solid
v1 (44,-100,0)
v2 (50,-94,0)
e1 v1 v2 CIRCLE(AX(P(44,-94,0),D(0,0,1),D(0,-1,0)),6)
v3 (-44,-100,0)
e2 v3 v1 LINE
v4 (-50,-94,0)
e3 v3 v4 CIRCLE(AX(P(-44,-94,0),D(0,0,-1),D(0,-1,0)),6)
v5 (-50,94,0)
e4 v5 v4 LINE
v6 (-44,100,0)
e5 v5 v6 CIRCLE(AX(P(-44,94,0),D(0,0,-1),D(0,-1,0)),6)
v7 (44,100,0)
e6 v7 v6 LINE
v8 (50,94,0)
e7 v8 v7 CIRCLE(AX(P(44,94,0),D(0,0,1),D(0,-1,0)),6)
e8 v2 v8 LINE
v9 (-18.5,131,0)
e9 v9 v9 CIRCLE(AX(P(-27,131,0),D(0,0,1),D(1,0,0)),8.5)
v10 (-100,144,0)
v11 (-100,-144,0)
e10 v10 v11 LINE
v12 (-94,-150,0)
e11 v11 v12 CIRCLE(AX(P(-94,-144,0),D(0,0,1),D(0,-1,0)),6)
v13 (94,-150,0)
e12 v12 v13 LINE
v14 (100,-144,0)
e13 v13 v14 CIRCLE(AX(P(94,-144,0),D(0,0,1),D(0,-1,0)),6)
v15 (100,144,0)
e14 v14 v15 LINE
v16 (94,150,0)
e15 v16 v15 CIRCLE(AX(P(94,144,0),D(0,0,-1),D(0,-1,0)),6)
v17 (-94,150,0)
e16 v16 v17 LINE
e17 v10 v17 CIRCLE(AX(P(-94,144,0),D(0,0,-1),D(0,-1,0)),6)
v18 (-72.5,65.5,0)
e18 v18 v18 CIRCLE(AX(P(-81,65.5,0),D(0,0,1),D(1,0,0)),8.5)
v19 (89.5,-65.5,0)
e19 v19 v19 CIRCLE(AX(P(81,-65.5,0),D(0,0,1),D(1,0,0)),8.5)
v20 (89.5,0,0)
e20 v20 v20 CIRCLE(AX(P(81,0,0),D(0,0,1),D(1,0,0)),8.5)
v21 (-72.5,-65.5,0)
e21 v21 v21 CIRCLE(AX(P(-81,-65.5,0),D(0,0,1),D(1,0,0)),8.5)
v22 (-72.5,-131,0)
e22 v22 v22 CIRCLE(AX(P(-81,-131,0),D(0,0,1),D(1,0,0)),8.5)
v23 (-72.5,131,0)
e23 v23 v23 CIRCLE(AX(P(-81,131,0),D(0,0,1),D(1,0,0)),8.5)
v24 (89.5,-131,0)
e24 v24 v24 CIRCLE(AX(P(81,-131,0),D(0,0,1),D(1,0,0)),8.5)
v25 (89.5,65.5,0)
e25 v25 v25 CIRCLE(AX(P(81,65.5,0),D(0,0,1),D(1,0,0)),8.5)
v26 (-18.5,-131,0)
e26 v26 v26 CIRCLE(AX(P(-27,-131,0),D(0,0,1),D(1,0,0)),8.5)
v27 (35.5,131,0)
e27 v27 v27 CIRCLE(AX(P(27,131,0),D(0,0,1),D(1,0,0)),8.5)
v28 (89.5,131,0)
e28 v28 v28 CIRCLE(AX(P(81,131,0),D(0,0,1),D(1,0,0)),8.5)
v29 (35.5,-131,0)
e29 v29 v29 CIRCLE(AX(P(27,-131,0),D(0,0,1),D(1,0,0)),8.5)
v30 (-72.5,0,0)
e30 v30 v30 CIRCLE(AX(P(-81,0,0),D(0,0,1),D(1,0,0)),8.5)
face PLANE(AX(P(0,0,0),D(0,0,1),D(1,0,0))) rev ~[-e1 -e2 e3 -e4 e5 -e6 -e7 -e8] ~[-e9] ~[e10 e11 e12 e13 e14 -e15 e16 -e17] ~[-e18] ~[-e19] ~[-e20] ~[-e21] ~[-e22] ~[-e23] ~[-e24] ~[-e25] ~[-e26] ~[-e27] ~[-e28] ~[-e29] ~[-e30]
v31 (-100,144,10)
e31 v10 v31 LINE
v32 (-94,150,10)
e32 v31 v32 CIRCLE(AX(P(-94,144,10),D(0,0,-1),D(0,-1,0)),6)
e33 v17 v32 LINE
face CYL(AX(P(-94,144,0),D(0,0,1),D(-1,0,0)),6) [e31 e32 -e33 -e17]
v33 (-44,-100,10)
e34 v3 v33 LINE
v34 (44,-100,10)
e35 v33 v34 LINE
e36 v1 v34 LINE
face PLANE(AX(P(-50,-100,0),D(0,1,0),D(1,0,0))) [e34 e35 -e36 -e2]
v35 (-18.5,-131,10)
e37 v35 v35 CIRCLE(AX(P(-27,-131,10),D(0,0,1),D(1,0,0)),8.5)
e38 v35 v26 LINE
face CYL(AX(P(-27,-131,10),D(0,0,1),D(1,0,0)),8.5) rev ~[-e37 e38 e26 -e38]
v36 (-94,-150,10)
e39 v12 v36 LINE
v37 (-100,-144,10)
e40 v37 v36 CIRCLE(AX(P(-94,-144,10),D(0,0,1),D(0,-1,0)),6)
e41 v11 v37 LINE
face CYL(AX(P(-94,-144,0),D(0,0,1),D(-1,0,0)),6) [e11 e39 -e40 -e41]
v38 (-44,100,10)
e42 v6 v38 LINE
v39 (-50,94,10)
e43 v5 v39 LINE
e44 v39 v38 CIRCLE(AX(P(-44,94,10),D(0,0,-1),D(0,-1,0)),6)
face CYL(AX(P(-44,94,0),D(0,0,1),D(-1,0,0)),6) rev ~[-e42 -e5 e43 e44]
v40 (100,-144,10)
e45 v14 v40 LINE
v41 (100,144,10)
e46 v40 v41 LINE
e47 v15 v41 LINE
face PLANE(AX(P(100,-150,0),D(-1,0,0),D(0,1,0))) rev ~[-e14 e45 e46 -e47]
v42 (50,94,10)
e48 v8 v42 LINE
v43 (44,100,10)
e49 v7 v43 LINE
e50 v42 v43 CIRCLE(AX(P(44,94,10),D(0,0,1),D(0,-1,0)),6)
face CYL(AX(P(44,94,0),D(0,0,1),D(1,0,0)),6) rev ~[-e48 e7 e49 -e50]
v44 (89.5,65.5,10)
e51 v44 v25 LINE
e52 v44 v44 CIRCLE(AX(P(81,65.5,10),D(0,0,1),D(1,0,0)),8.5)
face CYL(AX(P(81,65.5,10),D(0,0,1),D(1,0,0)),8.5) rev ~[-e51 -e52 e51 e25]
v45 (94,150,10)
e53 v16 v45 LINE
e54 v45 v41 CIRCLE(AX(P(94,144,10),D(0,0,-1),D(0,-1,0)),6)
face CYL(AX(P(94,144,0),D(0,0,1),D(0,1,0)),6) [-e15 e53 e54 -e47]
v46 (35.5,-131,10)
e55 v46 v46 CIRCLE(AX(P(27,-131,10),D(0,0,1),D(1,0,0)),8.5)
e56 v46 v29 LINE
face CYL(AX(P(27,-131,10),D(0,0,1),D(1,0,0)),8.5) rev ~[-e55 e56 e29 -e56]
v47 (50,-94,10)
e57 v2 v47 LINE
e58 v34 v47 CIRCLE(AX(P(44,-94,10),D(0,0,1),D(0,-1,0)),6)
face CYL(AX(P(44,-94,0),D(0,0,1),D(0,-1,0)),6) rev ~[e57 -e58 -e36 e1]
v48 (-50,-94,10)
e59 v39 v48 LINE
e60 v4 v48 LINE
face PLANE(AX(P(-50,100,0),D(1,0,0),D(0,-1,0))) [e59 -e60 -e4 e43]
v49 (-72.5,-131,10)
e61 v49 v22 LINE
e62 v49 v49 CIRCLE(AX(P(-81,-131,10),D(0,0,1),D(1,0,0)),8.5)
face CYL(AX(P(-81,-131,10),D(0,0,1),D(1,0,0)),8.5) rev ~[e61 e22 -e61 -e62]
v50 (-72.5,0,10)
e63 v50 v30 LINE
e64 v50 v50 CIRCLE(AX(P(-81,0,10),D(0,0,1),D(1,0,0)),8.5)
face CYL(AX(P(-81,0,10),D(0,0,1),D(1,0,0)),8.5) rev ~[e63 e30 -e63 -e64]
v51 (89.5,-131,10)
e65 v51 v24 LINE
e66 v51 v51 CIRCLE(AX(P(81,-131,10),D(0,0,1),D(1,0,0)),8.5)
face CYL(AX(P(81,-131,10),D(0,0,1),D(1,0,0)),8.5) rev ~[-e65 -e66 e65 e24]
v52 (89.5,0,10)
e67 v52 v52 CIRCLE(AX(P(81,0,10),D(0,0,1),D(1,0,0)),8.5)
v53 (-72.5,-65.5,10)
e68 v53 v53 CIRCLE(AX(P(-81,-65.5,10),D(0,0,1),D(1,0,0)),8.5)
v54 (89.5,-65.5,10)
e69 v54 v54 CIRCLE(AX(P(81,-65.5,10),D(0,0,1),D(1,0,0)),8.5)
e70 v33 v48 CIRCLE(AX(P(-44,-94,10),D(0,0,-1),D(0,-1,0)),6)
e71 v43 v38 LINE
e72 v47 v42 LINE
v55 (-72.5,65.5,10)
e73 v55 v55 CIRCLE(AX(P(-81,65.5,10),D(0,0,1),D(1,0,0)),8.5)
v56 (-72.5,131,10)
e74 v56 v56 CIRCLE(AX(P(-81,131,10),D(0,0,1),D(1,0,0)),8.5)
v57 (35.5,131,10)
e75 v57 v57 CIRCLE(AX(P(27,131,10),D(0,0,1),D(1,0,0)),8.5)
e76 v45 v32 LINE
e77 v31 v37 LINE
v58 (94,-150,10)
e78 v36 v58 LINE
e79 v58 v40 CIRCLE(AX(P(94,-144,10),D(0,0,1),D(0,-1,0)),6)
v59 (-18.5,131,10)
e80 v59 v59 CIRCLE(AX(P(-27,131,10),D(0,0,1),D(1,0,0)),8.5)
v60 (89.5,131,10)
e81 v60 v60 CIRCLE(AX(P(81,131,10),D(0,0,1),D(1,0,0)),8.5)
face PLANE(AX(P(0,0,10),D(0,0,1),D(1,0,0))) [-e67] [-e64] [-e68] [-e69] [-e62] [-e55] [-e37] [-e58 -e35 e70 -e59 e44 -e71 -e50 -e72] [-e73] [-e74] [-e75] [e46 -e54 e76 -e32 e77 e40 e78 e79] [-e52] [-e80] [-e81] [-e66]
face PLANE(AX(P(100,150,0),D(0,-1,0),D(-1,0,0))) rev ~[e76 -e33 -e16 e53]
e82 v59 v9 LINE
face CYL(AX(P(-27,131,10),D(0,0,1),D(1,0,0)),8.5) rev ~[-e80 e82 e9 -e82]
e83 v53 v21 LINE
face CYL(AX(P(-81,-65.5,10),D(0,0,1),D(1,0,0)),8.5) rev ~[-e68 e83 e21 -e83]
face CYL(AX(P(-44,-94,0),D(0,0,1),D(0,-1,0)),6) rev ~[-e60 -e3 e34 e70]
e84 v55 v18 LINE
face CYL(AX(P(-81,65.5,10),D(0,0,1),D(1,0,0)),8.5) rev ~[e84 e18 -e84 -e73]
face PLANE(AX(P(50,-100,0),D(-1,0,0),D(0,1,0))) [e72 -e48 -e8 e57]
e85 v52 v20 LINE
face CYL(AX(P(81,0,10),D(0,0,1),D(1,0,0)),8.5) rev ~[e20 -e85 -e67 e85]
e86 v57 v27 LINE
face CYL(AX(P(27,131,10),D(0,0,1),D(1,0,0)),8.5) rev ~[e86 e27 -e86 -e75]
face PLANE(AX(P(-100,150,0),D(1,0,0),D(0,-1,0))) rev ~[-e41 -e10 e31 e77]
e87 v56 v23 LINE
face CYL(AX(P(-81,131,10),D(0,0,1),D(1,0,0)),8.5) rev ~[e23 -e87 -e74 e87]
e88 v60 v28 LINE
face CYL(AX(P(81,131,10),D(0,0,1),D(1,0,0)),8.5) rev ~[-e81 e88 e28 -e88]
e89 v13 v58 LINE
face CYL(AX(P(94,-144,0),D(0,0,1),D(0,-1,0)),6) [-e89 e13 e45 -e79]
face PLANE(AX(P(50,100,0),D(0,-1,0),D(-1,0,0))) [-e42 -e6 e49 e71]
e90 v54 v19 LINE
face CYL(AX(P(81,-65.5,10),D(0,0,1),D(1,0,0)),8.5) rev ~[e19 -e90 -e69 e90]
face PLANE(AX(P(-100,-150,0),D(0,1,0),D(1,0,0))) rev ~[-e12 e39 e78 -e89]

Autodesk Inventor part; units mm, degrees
ref_plane "YZ Plane" through (0, 0, 0) normal (1, 0, 0) x (0, 1, 0)
ref_plane "XZ Plane" through (0, 0, 0) normal (0, 1, 0) x (-1, 0, 0)
ref_plane "XY Plane" through (0, 0, 0) normal (0, 0, 1) x (1, 0, 0)
sketch "Sketch2" plane through (0, 0, 0) normal (0, 0, 1) x (1, 0, 0)
  line L0 (-50, -100) -> (50, -100)
  line L1 (50, -100) -> (50, 100)
  line L2 (50, 100) -> (-50, 100)
  line L3 (-50, 100) -> (-50, -100)
  line L4 (-50, -100) -> (50, 100) construction
  line L5 (50, -100) -> (-50, 100) construction
  line L6 (-100, -150) -> (100, -150)
  line L7 (100, -150) -> (100, 150)
  line L8 (100, 150) -> (-100, 150)
  line L9 (-100, 150) -> (-100, -150)
  point P0 (0, 0)
  dimension "d29" = 100
  dimension "d30" = 200
  dimension "d31" = 50
extrude "Plate2" add sketch "Sketch2" along normal blind 10
sketch "Sketch5" plane through (0, 0, 10) normal (0, 0, 1) x (1, 0, 0)
  line L0 (50, 100) -> (50, -100) construction
  line L1 (50, -100) -> (-50, -100) construction
  line L2 (-50, -100) -> (-50, 100) construction
  line L3 (-50, 100) -> (50, 100) construction
  line L4 (100, -150) -> (-100, -150) construction
  line L5 (100, 150) -> (100, -150) construction
  line L6 (-100, 150) -> (100, 150) construction
  line L7 (-100, -150) -> (-100, 150) construction
  line L8 (-81, 131) -> (81, 131) construction
  line L9 (81, 131) -> (81, -131) construction
  line L10 (81, -131) -> (-81, -131) construction
  line L11 (-81, -131) -> (-81, 131) construction
  circle A0 centre (-81, -131) radius 8.5
  circle A1 centre (-81, 131) radius 8.5
  circle A2 centre (-81, 0) radius 8.5
  circle A3 centre (-81, -65.5) radius 8.5
  circle A4 centre (-81, 65.5) radius 8.5
  line L12 (-50, 0) -> (50, 0) construction
  circle A5 centre (-27, -131) radius 8.5
  circle A6 centre (-27, -65.5) radius 8.5
  circle A7 centre (-27, 0) radius 8.5
  circle A8 centre (-27, 65.5) radius 8.5
  circle A9 centre (-27, 131) radius 8.5
  circle A10 centre (27, -131) radius 8.5
  circle A11 centre (27, -65.5) radius 8.5
  circle A12 centre (27, 0) radius 8.5
  circle A13 centre (27, 65.5) radius 8.5
  circle A14 centre (27, 131) radius 8.5
  circle A15 centre (81, -131) radius 8.5
  circle A16 centre (81, -65.5) radius 8.5
  circle A17 centre (81, 0) radius 8.5
  circle A18 centre (81, 65.5) radius 8.5
  circle A19 centre (81, 131) radius 8.5
  point P0 (0, 0)
  point P1 (0, -131)
  dimension "d33" = 17
  dimension "d34" = 19
  dimension "d35" = 65.5
  dimension "d36" = 65.5
  dimension "d39" = 54
extrude "Cut3" cut sketch "Sketch5" against normal blind 10
fillet "Corner Round1" radius 6 8 edges at (-100, -150, 5) (-100, 150, 5) (100, 150, 5) (100, -150, 5) (50, -100, 5) (-50, -100, 5) (-50, 100, 5) (50, 100, 5)
equation "\"d35\" = d36"
equation "\"d44\" = Thickness"
equation "\"d14\" = Thickness"
equation "\"BendReliefDepth\" = 0.5 * Thickness"
equation "\"TransitionRadius\" = BendRadius"
equation "\"JacobiRadiusSize\" = BendRadius"
equation "\"Thickness\" = 10"
equation "\"BendRadius\" = 6"
properties part number "PNS 1606 charging flange round_1200" material "Steel"
